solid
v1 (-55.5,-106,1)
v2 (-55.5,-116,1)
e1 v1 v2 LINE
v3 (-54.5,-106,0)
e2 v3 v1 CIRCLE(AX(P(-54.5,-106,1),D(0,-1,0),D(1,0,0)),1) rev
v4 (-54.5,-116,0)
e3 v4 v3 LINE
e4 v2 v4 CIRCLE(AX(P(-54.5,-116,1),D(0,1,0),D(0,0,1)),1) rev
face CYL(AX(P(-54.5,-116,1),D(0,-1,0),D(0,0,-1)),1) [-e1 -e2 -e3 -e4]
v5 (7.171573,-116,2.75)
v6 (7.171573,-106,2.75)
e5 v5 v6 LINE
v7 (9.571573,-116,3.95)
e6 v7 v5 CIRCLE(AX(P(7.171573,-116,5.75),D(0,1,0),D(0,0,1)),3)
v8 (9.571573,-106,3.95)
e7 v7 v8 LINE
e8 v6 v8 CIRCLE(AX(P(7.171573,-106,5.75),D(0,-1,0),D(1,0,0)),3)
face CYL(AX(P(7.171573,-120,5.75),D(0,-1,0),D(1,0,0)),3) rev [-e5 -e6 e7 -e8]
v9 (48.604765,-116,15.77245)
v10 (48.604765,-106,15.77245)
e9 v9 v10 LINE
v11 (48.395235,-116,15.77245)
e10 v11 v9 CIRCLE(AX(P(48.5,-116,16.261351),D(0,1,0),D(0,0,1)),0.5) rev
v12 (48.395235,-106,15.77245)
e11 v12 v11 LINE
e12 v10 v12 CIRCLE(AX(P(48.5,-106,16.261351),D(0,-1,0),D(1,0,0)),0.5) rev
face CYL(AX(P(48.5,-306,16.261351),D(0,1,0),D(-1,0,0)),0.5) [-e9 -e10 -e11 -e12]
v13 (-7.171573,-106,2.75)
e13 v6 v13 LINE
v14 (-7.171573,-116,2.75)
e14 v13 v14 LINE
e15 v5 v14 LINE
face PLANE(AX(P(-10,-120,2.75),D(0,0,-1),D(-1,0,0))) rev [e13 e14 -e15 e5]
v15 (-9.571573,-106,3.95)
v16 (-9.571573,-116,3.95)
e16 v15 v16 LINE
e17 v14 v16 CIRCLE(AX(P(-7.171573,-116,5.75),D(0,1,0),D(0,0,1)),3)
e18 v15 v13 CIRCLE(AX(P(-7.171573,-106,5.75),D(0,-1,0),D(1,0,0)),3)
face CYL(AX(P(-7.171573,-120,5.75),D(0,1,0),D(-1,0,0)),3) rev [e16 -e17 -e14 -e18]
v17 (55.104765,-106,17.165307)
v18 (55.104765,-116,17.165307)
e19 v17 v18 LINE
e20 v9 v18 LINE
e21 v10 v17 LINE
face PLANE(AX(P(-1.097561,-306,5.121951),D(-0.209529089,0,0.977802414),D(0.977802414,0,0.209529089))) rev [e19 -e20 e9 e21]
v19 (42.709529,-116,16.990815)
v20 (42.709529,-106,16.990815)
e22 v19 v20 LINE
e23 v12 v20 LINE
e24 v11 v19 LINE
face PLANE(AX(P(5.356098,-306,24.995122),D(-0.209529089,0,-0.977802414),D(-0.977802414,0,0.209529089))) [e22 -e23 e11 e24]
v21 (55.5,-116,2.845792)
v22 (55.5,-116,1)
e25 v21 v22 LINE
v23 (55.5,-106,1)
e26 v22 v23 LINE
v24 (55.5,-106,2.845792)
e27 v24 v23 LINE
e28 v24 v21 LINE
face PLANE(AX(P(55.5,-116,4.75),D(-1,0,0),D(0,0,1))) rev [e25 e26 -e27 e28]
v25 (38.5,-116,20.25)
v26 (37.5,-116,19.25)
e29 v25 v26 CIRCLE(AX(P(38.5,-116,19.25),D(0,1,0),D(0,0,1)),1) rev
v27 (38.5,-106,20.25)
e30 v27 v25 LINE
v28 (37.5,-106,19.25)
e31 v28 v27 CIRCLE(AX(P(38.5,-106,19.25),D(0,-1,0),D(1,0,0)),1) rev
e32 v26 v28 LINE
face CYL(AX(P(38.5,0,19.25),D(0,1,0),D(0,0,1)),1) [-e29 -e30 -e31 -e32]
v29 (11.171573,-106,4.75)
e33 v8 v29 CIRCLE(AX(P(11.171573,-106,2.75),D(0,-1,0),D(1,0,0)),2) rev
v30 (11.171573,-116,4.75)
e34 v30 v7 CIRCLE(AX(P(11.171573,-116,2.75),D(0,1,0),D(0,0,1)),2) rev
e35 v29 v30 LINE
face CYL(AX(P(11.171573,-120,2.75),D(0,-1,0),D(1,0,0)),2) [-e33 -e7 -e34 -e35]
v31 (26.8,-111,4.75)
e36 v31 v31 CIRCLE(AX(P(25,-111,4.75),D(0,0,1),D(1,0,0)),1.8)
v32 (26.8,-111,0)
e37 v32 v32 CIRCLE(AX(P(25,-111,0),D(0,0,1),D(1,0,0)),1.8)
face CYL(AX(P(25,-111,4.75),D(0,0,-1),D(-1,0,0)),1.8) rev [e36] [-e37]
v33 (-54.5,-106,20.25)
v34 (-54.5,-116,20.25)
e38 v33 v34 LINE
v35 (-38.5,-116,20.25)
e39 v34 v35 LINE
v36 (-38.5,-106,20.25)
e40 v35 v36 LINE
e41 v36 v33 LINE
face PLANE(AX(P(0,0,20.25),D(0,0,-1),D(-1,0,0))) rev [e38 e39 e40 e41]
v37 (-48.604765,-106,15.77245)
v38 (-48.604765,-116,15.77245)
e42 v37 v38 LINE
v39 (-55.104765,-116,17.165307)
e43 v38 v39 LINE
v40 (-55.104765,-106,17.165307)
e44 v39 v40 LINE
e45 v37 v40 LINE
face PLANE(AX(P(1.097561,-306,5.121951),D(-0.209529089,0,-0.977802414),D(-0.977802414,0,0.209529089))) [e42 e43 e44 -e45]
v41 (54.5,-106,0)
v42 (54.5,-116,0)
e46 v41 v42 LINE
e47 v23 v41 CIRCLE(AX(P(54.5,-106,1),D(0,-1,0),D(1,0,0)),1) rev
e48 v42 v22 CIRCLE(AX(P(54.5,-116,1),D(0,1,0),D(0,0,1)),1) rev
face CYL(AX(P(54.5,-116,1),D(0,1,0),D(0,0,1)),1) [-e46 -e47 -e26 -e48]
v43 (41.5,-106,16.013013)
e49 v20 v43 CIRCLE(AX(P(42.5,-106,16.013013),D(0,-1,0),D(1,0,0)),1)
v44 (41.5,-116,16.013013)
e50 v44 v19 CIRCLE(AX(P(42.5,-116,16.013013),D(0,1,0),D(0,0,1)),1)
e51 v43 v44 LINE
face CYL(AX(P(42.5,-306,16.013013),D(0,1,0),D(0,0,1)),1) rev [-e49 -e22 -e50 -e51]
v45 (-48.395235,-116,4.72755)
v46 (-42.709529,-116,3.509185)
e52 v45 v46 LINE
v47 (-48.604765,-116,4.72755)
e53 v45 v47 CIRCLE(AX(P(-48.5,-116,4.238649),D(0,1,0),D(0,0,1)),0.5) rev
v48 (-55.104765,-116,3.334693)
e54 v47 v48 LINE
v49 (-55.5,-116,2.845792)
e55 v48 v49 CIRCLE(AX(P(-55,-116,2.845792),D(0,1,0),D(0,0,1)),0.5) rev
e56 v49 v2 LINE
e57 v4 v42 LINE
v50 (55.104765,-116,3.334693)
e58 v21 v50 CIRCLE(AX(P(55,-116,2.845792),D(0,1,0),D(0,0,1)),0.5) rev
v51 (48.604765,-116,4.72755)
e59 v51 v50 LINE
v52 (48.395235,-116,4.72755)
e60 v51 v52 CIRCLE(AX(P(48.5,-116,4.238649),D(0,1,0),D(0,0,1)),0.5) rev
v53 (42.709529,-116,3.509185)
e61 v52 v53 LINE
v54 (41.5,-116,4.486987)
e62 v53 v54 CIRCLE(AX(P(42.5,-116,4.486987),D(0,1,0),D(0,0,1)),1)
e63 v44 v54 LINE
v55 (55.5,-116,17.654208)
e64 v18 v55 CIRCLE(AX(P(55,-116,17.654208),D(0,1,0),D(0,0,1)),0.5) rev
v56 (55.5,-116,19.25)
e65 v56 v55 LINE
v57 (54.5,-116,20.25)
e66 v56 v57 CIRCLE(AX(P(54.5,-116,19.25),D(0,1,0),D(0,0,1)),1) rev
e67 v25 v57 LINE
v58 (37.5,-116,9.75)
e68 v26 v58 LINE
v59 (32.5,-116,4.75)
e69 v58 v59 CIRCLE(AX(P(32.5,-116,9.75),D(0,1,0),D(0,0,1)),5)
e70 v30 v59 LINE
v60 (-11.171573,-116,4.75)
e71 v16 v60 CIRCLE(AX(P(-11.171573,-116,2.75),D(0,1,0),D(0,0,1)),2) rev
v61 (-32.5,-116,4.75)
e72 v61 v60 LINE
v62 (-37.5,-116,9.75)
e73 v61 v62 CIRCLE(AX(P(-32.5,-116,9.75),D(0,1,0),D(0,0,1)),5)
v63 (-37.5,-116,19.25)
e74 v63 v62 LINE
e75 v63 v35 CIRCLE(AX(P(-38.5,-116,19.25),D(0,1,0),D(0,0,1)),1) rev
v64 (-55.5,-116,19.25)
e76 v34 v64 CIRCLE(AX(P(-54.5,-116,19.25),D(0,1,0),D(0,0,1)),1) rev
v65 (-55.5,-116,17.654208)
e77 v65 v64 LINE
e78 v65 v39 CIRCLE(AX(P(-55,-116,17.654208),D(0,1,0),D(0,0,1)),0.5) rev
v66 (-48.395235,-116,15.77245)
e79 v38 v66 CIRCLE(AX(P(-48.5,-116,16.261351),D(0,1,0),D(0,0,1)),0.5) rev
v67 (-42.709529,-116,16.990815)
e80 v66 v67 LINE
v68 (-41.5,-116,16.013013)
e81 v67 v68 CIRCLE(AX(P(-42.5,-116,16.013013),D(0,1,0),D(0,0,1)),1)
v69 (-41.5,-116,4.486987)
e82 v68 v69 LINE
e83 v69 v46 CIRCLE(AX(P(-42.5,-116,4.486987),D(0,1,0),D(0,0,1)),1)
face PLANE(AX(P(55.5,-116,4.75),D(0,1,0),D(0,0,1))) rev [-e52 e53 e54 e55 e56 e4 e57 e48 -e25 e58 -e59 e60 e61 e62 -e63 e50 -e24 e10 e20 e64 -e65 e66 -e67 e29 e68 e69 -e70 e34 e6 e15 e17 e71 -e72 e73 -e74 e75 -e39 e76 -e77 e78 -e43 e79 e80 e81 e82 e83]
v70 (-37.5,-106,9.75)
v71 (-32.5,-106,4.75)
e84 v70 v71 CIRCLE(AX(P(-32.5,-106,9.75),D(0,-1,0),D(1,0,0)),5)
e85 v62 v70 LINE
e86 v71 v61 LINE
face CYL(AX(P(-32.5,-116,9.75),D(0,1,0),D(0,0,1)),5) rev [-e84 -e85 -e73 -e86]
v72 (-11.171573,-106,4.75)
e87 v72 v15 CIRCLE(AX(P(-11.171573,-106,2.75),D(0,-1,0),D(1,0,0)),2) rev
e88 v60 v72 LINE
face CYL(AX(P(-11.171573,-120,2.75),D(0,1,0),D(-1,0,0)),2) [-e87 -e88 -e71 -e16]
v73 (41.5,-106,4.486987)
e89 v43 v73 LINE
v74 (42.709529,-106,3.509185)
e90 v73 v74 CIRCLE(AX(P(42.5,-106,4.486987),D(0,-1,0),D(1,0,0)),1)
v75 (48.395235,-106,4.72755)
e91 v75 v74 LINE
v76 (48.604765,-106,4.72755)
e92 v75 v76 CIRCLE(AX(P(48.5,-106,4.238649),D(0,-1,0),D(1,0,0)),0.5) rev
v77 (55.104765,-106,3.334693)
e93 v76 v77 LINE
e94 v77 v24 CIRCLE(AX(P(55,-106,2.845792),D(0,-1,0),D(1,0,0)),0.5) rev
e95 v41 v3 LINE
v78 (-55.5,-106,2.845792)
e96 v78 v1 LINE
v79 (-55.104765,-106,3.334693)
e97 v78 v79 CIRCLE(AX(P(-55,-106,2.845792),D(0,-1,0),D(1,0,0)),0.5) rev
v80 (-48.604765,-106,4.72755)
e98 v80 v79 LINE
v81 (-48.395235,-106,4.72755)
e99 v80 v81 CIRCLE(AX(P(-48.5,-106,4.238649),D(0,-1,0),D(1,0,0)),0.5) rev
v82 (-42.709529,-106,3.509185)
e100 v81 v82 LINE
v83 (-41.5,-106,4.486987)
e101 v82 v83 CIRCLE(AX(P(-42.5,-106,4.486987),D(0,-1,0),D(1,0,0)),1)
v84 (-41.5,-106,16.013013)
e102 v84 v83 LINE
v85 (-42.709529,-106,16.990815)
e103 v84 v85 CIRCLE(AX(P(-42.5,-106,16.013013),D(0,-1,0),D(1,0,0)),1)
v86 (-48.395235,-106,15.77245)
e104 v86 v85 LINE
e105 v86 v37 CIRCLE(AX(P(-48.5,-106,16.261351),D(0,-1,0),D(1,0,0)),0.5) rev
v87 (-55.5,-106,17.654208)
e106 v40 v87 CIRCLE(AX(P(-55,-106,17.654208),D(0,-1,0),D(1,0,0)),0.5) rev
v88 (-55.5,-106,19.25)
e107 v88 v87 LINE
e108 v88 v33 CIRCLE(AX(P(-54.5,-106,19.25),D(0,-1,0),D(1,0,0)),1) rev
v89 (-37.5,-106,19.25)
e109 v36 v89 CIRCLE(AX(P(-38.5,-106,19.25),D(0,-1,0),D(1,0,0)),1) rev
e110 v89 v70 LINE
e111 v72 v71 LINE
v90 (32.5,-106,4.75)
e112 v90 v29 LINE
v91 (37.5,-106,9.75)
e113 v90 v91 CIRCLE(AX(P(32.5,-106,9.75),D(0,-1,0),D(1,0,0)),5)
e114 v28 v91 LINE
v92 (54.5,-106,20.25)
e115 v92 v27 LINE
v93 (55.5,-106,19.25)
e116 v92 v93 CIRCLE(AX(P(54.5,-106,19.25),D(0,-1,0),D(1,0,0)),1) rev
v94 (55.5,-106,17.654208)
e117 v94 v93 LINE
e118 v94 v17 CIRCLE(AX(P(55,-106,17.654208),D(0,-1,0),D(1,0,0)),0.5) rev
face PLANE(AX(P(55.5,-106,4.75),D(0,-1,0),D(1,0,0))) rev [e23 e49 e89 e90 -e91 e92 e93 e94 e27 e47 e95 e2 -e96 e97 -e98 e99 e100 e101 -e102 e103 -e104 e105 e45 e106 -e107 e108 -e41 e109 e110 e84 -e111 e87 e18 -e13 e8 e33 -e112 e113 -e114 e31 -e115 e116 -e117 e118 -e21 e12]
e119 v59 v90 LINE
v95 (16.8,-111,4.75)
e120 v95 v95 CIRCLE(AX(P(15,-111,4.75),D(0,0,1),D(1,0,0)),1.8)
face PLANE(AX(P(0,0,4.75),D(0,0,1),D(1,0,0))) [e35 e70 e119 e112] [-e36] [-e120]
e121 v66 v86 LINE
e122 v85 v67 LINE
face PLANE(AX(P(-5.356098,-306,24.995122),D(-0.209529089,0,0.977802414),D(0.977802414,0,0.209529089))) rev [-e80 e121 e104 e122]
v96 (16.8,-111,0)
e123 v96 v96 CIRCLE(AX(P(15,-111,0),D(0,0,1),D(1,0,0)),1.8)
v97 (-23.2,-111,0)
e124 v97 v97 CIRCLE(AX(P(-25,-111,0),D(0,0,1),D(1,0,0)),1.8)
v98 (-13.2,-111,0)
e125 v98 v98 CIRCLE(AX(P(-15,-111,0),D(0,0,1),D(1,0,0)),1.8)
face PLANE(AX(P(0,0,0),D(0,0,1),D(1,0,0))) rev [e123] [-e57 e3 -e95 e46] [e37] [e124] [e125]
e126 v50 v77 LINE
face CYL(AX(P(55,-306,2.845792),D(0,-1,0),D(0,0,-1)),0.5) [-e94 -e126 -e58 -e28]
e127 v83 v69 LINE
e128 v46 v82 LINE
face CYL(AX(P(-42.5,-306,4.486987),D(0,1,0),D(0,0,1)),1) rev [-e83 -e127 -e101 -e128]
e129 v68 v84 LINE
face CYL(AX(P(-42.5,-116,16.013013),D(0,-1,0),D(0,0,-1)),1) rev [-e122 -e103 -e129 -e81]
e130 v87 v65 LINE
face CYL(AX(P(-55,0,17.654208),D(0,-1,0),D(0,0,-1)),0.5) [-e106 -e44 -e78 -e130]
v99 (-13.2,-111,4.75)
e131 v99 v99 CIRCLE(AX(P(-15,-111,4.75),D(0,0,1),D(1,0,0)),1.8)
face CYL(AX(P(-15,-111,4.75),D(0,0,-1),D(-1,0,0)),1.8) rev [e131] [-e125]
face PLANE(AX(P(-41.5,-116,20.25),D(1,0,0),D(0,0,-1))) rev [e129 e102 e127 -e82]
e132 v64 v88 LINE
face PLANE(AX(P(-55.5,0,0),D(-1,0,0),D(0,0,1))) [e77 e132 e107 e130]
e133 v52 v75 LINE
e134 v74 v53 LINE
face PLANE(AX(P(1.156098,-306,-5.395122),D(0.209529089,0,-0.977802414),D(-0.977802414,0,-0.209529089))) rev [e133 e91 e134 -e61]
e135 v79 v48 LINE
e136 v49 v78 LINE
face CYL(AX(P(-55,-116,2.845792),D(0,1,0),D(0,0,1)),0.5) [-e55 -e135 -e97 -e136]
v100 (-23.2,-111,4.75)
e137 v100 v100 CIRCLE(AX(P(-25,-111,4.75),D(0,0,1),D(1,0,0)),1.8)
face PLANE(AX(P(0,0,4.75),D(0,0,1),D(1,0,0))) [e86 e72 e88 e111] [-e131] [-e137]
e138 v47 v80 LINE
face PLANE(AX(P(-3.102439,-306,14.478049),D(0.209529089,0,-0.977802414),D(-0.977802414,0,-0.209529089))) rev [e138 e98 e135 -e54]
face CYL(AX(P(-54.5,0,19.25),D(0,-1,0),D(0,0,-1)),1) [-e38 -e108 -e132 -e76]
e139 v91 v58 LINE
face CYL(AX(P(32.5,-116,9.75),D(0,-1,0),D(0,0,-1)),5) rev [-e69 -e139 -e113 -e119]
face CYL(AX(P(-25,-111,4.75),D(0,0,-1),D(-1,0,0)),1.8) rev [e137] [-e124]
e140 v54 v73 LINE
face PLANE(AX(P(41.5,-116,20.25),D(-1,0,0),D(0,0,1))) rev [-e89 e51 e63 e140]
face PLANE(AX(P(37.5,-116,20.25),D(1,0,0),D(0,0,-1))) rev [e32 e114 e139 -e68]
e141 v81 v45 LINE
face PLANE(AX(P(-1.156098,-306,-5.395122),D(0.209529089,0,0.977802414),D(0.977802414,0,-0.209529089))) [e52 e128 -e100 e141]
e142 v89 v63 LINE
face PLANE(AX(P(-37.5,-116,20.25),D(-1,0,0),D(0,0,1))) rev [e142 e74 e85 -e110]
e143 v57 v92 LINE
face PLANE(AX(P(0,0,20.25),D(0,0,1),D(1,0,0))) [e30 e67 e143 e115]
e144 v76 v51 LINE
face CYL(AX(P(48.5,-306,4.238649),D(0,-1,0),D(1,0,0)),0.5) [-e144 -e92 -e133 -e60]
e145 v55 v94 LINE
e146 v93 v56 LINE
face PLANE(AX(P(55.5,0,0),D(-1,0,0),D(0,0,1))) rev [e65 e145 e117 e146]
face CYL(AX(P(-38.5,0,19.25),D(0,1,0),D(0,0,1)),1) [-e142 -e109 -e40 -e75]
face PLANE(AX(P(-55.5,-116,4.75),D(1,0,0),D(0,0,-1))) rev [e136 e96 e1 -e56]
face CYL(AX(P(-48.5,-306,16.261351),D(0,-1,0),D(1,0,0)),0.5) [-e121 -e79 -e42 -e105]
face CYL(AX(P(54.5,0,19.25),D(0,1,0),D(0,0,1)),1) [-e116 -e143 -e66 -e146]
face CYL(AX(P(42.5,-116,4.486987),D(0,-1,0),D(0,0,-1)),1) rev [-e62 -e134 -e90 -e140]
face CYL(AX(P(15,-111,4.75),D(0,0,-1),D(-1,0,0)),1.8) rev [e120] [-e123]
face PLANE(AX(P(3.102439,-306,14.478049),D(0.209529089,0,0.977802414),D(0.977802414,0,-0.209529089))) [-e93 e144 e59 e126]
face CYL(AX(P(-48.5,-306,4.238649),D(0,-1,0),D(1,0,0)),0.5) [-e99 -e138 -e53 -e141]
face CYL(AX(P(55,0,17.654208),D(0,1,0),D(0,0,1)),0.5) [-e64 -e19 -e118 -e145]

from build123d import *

# Parameters (mm, degrees)
SKETCH_1_W          = 111
SKETCH_1_H          = 10
SKETCH_1_R          = 1.8
EXTRUDE_1_DEPTH     = 4.75
SKETCH_2_W          = 4
SKETCH_2_H          = 10
EXTRUDE_2_DEPTH     = 15.5
SKETCH_3_W          = 4.5
SKETCH_3_H          = 10
EXTRUDE_3_DEPTH     = 14
SKETCH_4_W          = 4.5
SKETCH_4_H          = 10
EXTRUDE_4_DEPTH     = 14
FILLET_1_R          = 5
FILLET_2_R          = 1
SKETCH_5_W          = 20
SKETCH_5_H          = 2
CUT_EXTRUDE_1_DEPTH = 14
FILLET_4_R          = 3
FILLET_5_R          = 2
CUT_EXTRUDE_2_DEPTH = 200
FILLET_6_R          = 0.5
FILLET_7_R          = 1


with BuildPart() as part:
    # ｽｹｯﾁ1 → ﾎﾞｽ - 押し出し1 (new body)
    with BuildSketch(Plane.XY):
        with Locations((0, -111)):
            Rectangle(SKETCH_1_W, SKETCH_1_H)
        with Locations((25, -111)):
            Circle(SKETCH_1_R, mode=Mode.SUBTRACT)
        with Locations((15, -111)):
            Circle(SKETCH_1_R, mode=Mode.SUBTRACT)
        with Locations((-15, -111)):
            Circle(SKETCH_1_R, mode=Mode.SUBTRACT)
        with Locations((-25, -111)):
            Circle(SKETCH_1_R, mode=Mode.SUBTRACT)
    extrude(amount=EXTRUDE_1_DEPTH)

    # ｽｹｯﾁ2 → ﾎﾞｽ - 押し出し2 (add)
    with BuildSketch(Plane.XY.offset(4.75)):
        with Locations((39.5, -111)):
            Rectangle(SKETCH_2_W, SKETCH_2_H)
        with Locations((-39.5, -111)):
            Rectangle(SKETCH_2_W, SKETCH_2_H)
    extrude(amount=EXTRUDE_2_DEPTH)

    # ｽｹｯﾁ3 → ﾎﾞｽ - 押し出し3 (add)
    with BuildSketch(Plane(origin=(41.5, 0, 0), x_dir=(0, 0, -1), z_dir=(1, 0, 0))):
        with Locations((-18, -111)):
            Rectangle(SKETCH_3_W, SKETCH_3_H)
    extrude(amount=EXTRUDE_3_DEPTH)

    # ｽｹｯﾁ4 → ﾎﾞｽ - 押し出し4 (add)
    with BuildSketch(Plane.ZY.offset(41.5)):
        with Locations((18, -111)):
            Rectangle(SKETCH_4_W, SKETCH_4_H)
    extrude(amount=EXTRUDE_4_DEPTH)

    # ﾌｨﾚｯﾄ1
    fillet_1_edges = [part.edges().sort_by_distance(p)[0] for p in [
        (37.5, -111, 4.75),
        (-37.5, -111, 4.75),
    ]]
    fillet(fillet_1_edges, radius=FILLET_1_R)

    # ﾌｨﾚｯﾄ2
    fillet_2_edges = [part.edges().sort_by_distance(p)[0] for p in [
        (37.5, -111, 20.25),
        (-37.5, -111, 20.25),
        (-55.5, -111, 0),
        (55.5, -111, 20.25),
        (55.5, -111, 0),
        (-55.5, -111, 20.25),
    ]]
    fillet(fillet_2_edges, radius=FILLET_2_R)

    # ｽｹｯﾁ5 → ｶｯﾄ - 押し出し1 (cut)
    with BuildSketch(Plane(origin=(0, -106, 0), x_dir=(1, 0, 0), z_dir=(0, 1, 0))):
        with Locations((0, -3.75)):
            Rectangle(SKETCH_5_W, SKETCH_5_H)
    extrude(amount=-CUT_EXTRUDE_1_DEPTH, mode=Mode.SUBTRACT)

    # ﾌｨﾚｯﾄ4
    # the kernel refuses this fillet: 3 mm, written as the material it adds along each edge
    with BuildSketch(Plane(origin=(10, -106, 2.75), x_dir=(-1, 0, 0), z_dir=(0, -1, 0))) as fillet_4_piece_1:
        with BuildLine():
            CenterArc((2.828427125, -3), FILLET_4_R, 90, 70.528779366)
            Line((0, -2), (-0.056568542, -1.98))
            ThreePointArc((-0.056568542, -1.98), (-0.06, -1), (-0.06, 0))
            Line((-0.06, 0), (0, 0.06))
            Line((0, 0.06), (2.828427125, 0.06))
            Line((2.828427125, 0.06), (2.828427125, 0))
        make_face()
    extrude(amount=10)
    with BuildSketch(Plane(origin=(-10, -106, 2.75), x_dir=(0, 0, 1), z_dir=(0, -1, 0))) as fillet_4_piece_2:
        with BuildLine():
            CenterArc((3, -2.828427125), FILLET_4_R, 109.471220634, 70.528779366)
            Line((0, -2.828427125), (-0.06, -2.828427125))
            Line((-0.06, -2.828427125), (-0.06, 0))
            Line((-0.06, 0), (0, 0.06))
            ThreePointArc((0, 0.06), (1, 0.06), (1.98, 0.056568542))
            Line((1.98, 0.056568542), (2, 0))
        make_face()
    extrude(amount=10)

    # ﾌｨﾚｯﾄ5
    fillet_5_edges = [part.edges().sort_by_distance(p)[0] for p in [
        (-10, -111, 4.75),
        (10, -111, 4.75),
    ]]
    fillet(fillet_5_edges, radius=FILLET_5_R)

    # ｽｹｯﾁ6 → ｶｯﾄ - 押し出し2 (cut)
    with BuildSketch(Plane(origin=(0, -106, 0), x_dir=(1, 0, 0), z_dir=(0, 1, 0))):
        Polygon((-55.5, -4.75), (-48.5, -4.75), (-55.5, -3.25), align=None)
        Polygon((-41.5, -4.75), (-41.5, -3.25), (-48.5, -4.75), align=None)
        Polygon((-41.5, -15.75), (-48.5, -15.75), (-41.5, -17.25), align=None)
        Polygon((-55.5, -17.25), (-48.5, -15.75), (-55.5, -15.75), align=None)
        Polygon((55.5, -4.75), (55.5, -3.25), (48.5, -4.75), align=None)
        Polygon((41.5, -4.75), (48.5, -4.75), (41.5, -3.25), align=None)
        Polygon((55.5, -15.75), (48.5, -15.75), (55.5, -17.25), align=None)
        Polygon((41.5, -15.75), (41.5, -17.25), (48.5, -15.75), align=None)
    extrude(amount=-CUT_EXTRUDE_2_DEPTH, mode=Mode.SUBTRACT)

    # ﾌｨﾚｯﾄ6
    fillet_6_edges = [part.edges().sort_by_distance(p)[0] for p in [
        (-55.5, -111, 17.25),
        (48.5, -111, 15.75),
        (-48.5, -111, 4.75),
        (-55.5, -111, 3.25),
        (-48.5, -111, 15.75),
        (48.5, -111, 4.75),
        (55.5, -111, 3.25),
        (55.5, -111, 17.25),
    ]]
    fillet(fillet_6_edges, radius=FILLET_6_R)

    # ﾌｨﾚｯﾄ7
    fillet_7_edges = [part.edges().sort_by_distance(p)[0] for p in [
        (41.5, -111, 17.25),
        (-41.5, -111, 3.25),
        (-41.5, -111, 17.25),
        (41.5, -111, 3.25),
    ]]
    fillet(fillet_7_edges, radius=FILLET_7_R)


solid = part.part
